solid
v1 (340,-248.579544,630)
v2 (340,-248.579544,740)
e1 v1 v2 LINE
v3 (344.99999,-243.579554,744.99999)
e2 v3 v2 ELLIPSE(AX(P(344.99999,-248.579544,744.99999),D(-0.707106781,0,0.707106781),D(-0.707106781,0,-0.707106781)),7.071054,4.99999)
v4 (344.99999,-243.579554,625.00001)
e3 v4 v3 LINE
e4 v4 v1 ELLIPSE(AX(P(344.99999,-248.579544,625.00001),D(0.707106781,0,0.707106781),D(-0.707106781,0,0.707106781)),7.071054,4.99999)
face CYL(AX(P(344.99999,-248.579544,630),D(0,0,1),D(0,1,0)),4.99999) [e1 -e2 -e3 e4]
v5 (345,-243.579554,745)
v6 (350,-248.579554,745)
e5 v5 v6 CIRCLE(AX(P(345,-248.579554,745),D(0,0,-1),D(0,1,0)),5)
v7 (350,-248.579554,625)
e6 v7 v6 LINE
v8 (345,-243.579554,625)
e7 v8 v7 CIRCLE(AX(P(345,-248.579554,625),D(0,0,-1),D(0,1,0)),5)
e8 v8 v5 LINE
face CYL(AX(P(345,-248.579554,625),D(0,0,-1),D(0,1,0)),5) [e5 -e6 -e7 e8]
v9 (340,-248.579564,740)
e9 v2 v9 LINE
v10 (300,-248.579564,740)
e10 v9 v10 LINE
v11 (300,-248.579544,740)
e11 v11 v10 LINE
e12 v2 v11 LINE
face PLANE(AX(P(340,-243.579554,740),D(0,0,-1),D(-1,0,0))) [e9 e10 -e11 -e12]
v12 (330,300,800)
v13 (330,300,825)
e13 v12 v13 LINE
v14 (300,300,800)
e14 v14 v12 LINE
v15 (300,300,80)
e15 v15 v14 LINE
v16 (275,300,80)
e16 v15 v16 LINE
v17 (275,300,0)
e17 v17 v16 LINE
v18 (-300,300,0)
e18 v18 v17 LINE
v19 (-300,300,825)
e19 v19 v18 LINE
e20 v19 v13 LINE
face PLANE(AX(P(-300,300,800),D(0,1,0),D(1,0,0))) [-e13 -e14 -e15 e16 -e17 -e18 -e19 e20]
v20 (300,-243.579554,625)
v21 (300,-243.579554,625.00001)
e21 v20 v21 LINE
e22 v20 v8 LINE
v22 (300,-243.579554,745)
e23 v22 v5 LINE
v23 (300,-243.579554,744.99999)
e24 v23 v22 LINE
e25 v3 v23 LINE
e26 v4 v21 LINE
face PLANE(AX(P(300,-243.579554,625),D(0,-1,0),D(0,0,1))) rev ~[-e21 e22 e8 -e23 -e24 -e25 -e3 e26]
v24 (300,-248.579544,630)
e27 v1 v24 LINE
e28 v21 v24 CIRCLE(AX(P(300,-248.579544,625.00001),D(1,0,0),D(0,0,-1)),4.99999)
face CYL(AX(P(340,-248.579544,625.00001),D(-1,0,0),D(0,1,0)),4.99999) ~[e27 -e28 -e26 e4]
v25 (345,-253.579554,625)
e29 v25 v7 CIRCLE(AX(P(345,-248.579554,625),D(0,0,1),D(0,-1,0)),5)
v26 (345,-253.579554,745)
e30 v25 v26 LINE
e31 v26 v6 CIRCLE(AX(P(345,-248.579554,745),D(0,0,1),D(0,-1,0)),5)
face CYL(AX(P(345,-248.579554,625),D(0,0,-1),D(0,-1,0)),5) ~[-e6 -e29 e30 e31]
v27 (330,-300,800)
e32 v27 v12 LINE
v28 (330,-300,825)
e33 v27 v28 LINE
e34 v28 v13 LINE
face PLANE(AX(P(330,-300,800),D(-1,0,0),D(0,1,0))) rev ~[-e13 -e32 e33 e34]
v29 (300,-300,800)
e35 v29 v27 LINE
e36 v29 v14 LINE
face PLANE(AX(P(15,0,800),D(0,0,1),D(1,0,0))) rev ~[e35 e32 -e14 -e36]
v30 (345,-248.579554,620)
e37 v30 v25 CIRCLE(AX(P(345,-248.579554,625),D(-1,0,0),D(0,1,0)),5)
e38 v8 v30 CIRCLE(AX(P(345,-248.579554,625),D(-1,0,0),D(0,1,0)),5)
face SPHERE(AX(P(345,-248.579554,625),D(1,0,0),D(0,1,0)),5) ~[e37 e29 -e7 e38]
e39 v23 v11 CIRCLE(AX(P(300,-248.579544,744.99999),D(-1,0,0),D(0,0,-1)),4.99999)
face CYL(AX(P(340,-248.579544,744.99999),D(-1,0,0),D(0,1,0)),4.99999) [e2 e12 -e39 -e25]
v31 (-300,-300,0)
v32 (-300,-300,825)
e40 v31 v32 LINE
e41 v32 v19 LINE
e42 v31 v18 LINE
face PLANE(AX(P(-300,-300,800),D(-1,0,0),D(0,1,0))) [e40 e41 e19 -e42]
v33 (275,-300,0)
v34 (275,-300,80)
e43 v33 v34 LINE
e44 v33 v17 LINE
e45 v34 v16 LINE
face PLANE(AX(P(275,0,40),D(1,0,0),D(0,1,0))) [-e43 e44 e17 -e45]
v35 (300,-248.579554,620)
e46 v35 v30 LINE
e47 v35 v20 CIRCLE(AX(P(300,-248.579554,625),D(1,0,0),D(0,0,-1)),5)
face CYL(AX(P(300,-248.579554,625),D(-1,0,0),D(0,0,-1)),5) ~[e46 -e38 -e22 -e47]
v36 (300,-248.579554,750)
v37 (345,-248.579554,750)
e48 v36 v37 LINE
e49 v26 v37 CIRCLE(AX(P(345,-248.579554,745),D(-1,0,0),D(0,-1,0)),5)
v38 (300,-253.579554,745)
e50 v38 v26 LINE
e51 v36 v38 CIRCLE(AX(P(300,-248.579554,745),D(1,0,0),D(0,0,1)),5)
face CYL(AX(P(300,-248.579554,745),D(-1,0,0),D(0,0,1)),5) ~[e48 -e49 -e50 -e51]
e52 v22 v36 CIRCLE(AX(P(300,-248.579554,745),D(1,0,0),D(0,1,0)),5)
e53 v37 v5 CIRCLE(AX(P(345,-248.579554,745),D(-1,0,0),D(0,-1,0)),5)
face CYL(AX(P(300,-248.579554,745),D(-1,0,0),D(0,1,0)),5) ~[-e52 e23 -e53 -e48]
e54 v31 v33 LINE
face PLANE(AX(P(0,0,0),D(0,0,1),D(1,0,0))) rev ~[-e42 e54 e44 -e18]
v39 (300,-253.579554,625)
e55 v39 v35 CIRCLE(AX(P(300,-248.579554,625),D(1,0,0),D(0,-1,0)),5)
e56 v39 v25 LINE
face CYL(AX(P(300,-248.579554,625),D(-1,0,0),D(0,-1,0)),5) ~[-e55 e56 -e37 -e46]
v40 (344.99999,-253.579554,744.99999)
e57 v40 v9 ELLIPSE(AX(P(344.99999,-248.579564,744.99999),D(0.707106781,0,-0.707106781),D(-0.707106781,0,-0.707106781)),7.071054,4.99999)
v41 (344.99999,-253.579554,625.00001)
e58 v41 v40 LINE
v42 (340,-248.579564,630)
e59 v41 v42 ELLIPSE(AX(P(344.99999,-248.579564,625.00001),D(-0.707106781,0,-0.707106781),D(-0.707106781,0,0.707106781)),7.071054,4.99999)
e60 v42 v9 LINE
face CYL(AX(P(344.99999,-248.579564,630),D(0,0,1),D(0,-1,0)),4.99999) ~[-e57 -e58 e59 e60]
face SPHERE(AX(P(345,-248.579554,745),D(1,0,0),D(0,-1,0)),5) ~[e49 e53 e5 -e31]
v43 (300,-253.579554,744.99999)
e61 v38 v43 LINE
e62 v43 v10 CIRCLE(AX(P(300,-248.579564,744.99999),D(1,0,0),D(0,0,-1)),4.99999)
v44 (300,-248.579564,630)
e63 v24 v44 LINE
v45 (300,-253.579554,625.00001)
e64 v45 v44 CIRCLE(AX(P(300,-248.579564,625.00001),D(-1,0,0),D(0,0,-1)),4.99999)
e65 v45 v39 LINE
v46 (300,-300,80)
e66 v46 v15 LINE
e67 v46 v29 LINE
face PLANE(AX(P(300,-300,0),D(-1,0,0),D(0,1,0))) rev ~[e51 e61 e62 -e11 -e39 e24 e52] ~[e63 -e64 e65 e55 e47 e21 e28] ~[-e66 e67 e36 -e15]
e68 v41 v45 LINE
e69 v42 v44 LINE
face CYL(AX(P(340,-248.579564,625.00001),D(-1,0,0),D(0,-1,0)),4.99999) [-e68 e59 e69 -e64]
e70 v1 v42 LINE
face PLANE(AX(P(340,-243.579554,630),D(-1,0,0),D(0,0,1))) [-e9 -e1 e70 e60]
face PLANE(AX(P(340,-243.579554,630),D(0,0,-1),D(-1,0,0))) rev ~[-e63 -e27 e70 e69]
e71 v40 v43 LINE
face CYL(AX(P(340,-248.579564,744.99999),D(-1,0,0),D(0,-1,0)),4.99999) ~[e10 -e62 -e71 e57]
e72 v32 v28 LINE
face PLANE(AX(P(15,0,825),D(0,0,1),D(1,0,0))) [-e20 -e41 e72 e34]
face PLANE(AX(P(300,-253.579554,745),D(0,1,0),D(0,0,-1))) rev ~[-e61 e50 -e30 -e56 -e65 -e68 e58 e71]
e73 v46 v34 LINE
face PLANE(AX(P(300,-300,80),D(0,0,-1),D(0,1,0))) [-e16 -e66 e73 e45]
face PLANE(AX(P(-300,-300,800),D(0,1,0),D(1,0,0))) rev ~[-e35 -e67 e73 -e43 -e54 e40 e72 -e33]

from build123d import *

# Parameters (mm, degrees)
F0_W        = 600
F0_H        = 600
F1_DEPTH    = 800
F2_W        = 600
F2_H        = 80
F3_DEPTH    = 25
F5_DEPTH    = 50
F6_T1_DEPTH = 120
F6_T4_ANGLE = 180
F6_T6_ANGLE = 180
F7_W        = 40
F7_H        = 110
F8_DEPTH    = 25
F9_R        = 4.99999
F10_W       = 630
F10_H       = 600
F11_DEPTH   = 25


# Not quite as in the source:
# - a fillet or chamfer that OpenCascade refuses, or shapes differently, is made with other operations: its cross-section is extruded or revolved along the edge and cut away or added
# - a fillet or chamfer is up to 0.001 mm smaller than in the source, because OpenCascade refuses the exact size


with BuildPart() as f1:
    # F0 (on Top) → F1 (new body)
    with BuildSketch(Plane.XY):
        Rectangle(F0_W, F0_H)
    extrude(amount=F1_DEPTH)

    # F2 (on face) → F3 (cut)
    with BuildSketch(Plane.YZ.offset(300)):
        with Locations((0, 40)):
            Rectangle(F2_W, F2_H)
    extrude(amount=-F3_DEPTH, mode=Mode.SUBTRACT)

    # F4 (on face) → F5 (join)
    with BuildSketch(Plane.YZ.offset(300)):
        with BuildLine():
            ThreePointArc((-248.5795542598, 750), (-252.1150881657, 748.5355339059), (-253.5795542598, 745))
            Line((-253.5795542598, 745), (-253.5795542598, 625))
            ThreePointArc((-253.5795542598, 625), (-252.1150881657, 621.4644660941), (-248.5795542598, 620))
            ThreePointArc((-248.5795542598, 620), (-245.0440203538, 621.4644660941), (-243.5795542598, 625))
            Line((-243.5795542598, 625), (-243.5795542598, 745))
            ThreePointArc((-243.5795542598, 745), (-245.0440203538, 748.5355339059), (-248.5795542598, 750))
        make_face()
    extrude(amount=F5_DEPTH)

    # F6: fillet of radius 5 on 4 edges, made by hand

    # F6_s2 → F6_t1 (cut)
    with BuildSketch(Plane.XY.offset(625)):
        with BuildLine():
            ThreePointArc((345, -253.5795542598), (348.5355339059, -252.1150881657), (350, -248.5795542598))
            Line((350, -248.5795542598), (350, -253.5795542598))
            Line((350, -253.5795542598), (345, -253.5795542598))
        make_face()
        with BuildLine():
            ThreePointArc((345, -243.5795542598), (348.5355339059, -245.0440203538), (350, -248.5795542598))
            Line((350, -248.5795542598), (350, -243.5795542598))
            Line((350, -243.5795542598), (345, -243.5795542598))
        make_face()
    extrude(amount=F6_T1_DEPTH, mode=Mode.SUBTRACT)

    # F6_s3 → F6_t4 (revolve, cut)
    with BuildSketch(Plane.XY.offset(745)):
        with BuildLine():
            ThreePointArc((345, -253.5795542598), (348.5355339059, -252.1150881657), (350, -248.5795542598))
            Line((350, -248.5795542598), (350, -253.5795542598))
            Line((350, -253.5795542598), (345, -253.5795542598))
        make_face()
    revolve(axis=Axis((350, -248.5795542598, 745), (-1, 0, 0)), revolution_arc=F6_T4_ANGLE, mode=Mode.SUBTRACT)

    # F6_s5 → F6_t6 (revolve, cut)
    with BuildSketch(Plane.XY.offset(625)):
        with BuildLine():
            ThreePointArc((345, -243.5795542598), (348.5355339059, -245.0440203538), (350, -248.5795542598))
            Line((350, -248.5795542598), (350, -243.5795542598))
            Line((350, -243.5795542598), (345, -243.5795542598))
        make_face()
    revolve(axis=Axis((350, -248.5795542598, 625), (-1, 0, 0)), revolution_arc=F6_T6_ANGLE, mode=Mode.SUBTRACT)

    # F7 (on face) → F8 (cut)
    with BuildSketch(Plane(origin=(0, -243.5795542598, 0), x_dir=(-1, 0, 0), z_dir=(0, 1, 0))):
        with Locations((-320, 685)):
            Rectangle(F7_W, F7_H)
    extrude(amount=-F8_DEPTH, mode=Mode.SUBTRACT)

    # F9 (radius 5 in the source; OpenCascade refuses exactly that, so slightly less here)
    f9_edges = [f1.edges().sort_by_distance(p)[0] for p in [
        (320, -243.579554, 740),
        (340, -243.579554, 685),
        (320, -243.579554, 630),
        (320, -253.579554, 740),
        (340, -253.579554, 685),
        (320, -253.579554, 630),
    ]]
    fillet(f9_edges, radius=F9_R)

    # F10 (on face) → F11 (join)
    with BuildSketch(Plane.XY.offset(800)):
        with Locations((15, 0)):
            Rectangle(F10_W, F10_H)
    extrude(amount=F11_DEPTH)


solid = f1.part
